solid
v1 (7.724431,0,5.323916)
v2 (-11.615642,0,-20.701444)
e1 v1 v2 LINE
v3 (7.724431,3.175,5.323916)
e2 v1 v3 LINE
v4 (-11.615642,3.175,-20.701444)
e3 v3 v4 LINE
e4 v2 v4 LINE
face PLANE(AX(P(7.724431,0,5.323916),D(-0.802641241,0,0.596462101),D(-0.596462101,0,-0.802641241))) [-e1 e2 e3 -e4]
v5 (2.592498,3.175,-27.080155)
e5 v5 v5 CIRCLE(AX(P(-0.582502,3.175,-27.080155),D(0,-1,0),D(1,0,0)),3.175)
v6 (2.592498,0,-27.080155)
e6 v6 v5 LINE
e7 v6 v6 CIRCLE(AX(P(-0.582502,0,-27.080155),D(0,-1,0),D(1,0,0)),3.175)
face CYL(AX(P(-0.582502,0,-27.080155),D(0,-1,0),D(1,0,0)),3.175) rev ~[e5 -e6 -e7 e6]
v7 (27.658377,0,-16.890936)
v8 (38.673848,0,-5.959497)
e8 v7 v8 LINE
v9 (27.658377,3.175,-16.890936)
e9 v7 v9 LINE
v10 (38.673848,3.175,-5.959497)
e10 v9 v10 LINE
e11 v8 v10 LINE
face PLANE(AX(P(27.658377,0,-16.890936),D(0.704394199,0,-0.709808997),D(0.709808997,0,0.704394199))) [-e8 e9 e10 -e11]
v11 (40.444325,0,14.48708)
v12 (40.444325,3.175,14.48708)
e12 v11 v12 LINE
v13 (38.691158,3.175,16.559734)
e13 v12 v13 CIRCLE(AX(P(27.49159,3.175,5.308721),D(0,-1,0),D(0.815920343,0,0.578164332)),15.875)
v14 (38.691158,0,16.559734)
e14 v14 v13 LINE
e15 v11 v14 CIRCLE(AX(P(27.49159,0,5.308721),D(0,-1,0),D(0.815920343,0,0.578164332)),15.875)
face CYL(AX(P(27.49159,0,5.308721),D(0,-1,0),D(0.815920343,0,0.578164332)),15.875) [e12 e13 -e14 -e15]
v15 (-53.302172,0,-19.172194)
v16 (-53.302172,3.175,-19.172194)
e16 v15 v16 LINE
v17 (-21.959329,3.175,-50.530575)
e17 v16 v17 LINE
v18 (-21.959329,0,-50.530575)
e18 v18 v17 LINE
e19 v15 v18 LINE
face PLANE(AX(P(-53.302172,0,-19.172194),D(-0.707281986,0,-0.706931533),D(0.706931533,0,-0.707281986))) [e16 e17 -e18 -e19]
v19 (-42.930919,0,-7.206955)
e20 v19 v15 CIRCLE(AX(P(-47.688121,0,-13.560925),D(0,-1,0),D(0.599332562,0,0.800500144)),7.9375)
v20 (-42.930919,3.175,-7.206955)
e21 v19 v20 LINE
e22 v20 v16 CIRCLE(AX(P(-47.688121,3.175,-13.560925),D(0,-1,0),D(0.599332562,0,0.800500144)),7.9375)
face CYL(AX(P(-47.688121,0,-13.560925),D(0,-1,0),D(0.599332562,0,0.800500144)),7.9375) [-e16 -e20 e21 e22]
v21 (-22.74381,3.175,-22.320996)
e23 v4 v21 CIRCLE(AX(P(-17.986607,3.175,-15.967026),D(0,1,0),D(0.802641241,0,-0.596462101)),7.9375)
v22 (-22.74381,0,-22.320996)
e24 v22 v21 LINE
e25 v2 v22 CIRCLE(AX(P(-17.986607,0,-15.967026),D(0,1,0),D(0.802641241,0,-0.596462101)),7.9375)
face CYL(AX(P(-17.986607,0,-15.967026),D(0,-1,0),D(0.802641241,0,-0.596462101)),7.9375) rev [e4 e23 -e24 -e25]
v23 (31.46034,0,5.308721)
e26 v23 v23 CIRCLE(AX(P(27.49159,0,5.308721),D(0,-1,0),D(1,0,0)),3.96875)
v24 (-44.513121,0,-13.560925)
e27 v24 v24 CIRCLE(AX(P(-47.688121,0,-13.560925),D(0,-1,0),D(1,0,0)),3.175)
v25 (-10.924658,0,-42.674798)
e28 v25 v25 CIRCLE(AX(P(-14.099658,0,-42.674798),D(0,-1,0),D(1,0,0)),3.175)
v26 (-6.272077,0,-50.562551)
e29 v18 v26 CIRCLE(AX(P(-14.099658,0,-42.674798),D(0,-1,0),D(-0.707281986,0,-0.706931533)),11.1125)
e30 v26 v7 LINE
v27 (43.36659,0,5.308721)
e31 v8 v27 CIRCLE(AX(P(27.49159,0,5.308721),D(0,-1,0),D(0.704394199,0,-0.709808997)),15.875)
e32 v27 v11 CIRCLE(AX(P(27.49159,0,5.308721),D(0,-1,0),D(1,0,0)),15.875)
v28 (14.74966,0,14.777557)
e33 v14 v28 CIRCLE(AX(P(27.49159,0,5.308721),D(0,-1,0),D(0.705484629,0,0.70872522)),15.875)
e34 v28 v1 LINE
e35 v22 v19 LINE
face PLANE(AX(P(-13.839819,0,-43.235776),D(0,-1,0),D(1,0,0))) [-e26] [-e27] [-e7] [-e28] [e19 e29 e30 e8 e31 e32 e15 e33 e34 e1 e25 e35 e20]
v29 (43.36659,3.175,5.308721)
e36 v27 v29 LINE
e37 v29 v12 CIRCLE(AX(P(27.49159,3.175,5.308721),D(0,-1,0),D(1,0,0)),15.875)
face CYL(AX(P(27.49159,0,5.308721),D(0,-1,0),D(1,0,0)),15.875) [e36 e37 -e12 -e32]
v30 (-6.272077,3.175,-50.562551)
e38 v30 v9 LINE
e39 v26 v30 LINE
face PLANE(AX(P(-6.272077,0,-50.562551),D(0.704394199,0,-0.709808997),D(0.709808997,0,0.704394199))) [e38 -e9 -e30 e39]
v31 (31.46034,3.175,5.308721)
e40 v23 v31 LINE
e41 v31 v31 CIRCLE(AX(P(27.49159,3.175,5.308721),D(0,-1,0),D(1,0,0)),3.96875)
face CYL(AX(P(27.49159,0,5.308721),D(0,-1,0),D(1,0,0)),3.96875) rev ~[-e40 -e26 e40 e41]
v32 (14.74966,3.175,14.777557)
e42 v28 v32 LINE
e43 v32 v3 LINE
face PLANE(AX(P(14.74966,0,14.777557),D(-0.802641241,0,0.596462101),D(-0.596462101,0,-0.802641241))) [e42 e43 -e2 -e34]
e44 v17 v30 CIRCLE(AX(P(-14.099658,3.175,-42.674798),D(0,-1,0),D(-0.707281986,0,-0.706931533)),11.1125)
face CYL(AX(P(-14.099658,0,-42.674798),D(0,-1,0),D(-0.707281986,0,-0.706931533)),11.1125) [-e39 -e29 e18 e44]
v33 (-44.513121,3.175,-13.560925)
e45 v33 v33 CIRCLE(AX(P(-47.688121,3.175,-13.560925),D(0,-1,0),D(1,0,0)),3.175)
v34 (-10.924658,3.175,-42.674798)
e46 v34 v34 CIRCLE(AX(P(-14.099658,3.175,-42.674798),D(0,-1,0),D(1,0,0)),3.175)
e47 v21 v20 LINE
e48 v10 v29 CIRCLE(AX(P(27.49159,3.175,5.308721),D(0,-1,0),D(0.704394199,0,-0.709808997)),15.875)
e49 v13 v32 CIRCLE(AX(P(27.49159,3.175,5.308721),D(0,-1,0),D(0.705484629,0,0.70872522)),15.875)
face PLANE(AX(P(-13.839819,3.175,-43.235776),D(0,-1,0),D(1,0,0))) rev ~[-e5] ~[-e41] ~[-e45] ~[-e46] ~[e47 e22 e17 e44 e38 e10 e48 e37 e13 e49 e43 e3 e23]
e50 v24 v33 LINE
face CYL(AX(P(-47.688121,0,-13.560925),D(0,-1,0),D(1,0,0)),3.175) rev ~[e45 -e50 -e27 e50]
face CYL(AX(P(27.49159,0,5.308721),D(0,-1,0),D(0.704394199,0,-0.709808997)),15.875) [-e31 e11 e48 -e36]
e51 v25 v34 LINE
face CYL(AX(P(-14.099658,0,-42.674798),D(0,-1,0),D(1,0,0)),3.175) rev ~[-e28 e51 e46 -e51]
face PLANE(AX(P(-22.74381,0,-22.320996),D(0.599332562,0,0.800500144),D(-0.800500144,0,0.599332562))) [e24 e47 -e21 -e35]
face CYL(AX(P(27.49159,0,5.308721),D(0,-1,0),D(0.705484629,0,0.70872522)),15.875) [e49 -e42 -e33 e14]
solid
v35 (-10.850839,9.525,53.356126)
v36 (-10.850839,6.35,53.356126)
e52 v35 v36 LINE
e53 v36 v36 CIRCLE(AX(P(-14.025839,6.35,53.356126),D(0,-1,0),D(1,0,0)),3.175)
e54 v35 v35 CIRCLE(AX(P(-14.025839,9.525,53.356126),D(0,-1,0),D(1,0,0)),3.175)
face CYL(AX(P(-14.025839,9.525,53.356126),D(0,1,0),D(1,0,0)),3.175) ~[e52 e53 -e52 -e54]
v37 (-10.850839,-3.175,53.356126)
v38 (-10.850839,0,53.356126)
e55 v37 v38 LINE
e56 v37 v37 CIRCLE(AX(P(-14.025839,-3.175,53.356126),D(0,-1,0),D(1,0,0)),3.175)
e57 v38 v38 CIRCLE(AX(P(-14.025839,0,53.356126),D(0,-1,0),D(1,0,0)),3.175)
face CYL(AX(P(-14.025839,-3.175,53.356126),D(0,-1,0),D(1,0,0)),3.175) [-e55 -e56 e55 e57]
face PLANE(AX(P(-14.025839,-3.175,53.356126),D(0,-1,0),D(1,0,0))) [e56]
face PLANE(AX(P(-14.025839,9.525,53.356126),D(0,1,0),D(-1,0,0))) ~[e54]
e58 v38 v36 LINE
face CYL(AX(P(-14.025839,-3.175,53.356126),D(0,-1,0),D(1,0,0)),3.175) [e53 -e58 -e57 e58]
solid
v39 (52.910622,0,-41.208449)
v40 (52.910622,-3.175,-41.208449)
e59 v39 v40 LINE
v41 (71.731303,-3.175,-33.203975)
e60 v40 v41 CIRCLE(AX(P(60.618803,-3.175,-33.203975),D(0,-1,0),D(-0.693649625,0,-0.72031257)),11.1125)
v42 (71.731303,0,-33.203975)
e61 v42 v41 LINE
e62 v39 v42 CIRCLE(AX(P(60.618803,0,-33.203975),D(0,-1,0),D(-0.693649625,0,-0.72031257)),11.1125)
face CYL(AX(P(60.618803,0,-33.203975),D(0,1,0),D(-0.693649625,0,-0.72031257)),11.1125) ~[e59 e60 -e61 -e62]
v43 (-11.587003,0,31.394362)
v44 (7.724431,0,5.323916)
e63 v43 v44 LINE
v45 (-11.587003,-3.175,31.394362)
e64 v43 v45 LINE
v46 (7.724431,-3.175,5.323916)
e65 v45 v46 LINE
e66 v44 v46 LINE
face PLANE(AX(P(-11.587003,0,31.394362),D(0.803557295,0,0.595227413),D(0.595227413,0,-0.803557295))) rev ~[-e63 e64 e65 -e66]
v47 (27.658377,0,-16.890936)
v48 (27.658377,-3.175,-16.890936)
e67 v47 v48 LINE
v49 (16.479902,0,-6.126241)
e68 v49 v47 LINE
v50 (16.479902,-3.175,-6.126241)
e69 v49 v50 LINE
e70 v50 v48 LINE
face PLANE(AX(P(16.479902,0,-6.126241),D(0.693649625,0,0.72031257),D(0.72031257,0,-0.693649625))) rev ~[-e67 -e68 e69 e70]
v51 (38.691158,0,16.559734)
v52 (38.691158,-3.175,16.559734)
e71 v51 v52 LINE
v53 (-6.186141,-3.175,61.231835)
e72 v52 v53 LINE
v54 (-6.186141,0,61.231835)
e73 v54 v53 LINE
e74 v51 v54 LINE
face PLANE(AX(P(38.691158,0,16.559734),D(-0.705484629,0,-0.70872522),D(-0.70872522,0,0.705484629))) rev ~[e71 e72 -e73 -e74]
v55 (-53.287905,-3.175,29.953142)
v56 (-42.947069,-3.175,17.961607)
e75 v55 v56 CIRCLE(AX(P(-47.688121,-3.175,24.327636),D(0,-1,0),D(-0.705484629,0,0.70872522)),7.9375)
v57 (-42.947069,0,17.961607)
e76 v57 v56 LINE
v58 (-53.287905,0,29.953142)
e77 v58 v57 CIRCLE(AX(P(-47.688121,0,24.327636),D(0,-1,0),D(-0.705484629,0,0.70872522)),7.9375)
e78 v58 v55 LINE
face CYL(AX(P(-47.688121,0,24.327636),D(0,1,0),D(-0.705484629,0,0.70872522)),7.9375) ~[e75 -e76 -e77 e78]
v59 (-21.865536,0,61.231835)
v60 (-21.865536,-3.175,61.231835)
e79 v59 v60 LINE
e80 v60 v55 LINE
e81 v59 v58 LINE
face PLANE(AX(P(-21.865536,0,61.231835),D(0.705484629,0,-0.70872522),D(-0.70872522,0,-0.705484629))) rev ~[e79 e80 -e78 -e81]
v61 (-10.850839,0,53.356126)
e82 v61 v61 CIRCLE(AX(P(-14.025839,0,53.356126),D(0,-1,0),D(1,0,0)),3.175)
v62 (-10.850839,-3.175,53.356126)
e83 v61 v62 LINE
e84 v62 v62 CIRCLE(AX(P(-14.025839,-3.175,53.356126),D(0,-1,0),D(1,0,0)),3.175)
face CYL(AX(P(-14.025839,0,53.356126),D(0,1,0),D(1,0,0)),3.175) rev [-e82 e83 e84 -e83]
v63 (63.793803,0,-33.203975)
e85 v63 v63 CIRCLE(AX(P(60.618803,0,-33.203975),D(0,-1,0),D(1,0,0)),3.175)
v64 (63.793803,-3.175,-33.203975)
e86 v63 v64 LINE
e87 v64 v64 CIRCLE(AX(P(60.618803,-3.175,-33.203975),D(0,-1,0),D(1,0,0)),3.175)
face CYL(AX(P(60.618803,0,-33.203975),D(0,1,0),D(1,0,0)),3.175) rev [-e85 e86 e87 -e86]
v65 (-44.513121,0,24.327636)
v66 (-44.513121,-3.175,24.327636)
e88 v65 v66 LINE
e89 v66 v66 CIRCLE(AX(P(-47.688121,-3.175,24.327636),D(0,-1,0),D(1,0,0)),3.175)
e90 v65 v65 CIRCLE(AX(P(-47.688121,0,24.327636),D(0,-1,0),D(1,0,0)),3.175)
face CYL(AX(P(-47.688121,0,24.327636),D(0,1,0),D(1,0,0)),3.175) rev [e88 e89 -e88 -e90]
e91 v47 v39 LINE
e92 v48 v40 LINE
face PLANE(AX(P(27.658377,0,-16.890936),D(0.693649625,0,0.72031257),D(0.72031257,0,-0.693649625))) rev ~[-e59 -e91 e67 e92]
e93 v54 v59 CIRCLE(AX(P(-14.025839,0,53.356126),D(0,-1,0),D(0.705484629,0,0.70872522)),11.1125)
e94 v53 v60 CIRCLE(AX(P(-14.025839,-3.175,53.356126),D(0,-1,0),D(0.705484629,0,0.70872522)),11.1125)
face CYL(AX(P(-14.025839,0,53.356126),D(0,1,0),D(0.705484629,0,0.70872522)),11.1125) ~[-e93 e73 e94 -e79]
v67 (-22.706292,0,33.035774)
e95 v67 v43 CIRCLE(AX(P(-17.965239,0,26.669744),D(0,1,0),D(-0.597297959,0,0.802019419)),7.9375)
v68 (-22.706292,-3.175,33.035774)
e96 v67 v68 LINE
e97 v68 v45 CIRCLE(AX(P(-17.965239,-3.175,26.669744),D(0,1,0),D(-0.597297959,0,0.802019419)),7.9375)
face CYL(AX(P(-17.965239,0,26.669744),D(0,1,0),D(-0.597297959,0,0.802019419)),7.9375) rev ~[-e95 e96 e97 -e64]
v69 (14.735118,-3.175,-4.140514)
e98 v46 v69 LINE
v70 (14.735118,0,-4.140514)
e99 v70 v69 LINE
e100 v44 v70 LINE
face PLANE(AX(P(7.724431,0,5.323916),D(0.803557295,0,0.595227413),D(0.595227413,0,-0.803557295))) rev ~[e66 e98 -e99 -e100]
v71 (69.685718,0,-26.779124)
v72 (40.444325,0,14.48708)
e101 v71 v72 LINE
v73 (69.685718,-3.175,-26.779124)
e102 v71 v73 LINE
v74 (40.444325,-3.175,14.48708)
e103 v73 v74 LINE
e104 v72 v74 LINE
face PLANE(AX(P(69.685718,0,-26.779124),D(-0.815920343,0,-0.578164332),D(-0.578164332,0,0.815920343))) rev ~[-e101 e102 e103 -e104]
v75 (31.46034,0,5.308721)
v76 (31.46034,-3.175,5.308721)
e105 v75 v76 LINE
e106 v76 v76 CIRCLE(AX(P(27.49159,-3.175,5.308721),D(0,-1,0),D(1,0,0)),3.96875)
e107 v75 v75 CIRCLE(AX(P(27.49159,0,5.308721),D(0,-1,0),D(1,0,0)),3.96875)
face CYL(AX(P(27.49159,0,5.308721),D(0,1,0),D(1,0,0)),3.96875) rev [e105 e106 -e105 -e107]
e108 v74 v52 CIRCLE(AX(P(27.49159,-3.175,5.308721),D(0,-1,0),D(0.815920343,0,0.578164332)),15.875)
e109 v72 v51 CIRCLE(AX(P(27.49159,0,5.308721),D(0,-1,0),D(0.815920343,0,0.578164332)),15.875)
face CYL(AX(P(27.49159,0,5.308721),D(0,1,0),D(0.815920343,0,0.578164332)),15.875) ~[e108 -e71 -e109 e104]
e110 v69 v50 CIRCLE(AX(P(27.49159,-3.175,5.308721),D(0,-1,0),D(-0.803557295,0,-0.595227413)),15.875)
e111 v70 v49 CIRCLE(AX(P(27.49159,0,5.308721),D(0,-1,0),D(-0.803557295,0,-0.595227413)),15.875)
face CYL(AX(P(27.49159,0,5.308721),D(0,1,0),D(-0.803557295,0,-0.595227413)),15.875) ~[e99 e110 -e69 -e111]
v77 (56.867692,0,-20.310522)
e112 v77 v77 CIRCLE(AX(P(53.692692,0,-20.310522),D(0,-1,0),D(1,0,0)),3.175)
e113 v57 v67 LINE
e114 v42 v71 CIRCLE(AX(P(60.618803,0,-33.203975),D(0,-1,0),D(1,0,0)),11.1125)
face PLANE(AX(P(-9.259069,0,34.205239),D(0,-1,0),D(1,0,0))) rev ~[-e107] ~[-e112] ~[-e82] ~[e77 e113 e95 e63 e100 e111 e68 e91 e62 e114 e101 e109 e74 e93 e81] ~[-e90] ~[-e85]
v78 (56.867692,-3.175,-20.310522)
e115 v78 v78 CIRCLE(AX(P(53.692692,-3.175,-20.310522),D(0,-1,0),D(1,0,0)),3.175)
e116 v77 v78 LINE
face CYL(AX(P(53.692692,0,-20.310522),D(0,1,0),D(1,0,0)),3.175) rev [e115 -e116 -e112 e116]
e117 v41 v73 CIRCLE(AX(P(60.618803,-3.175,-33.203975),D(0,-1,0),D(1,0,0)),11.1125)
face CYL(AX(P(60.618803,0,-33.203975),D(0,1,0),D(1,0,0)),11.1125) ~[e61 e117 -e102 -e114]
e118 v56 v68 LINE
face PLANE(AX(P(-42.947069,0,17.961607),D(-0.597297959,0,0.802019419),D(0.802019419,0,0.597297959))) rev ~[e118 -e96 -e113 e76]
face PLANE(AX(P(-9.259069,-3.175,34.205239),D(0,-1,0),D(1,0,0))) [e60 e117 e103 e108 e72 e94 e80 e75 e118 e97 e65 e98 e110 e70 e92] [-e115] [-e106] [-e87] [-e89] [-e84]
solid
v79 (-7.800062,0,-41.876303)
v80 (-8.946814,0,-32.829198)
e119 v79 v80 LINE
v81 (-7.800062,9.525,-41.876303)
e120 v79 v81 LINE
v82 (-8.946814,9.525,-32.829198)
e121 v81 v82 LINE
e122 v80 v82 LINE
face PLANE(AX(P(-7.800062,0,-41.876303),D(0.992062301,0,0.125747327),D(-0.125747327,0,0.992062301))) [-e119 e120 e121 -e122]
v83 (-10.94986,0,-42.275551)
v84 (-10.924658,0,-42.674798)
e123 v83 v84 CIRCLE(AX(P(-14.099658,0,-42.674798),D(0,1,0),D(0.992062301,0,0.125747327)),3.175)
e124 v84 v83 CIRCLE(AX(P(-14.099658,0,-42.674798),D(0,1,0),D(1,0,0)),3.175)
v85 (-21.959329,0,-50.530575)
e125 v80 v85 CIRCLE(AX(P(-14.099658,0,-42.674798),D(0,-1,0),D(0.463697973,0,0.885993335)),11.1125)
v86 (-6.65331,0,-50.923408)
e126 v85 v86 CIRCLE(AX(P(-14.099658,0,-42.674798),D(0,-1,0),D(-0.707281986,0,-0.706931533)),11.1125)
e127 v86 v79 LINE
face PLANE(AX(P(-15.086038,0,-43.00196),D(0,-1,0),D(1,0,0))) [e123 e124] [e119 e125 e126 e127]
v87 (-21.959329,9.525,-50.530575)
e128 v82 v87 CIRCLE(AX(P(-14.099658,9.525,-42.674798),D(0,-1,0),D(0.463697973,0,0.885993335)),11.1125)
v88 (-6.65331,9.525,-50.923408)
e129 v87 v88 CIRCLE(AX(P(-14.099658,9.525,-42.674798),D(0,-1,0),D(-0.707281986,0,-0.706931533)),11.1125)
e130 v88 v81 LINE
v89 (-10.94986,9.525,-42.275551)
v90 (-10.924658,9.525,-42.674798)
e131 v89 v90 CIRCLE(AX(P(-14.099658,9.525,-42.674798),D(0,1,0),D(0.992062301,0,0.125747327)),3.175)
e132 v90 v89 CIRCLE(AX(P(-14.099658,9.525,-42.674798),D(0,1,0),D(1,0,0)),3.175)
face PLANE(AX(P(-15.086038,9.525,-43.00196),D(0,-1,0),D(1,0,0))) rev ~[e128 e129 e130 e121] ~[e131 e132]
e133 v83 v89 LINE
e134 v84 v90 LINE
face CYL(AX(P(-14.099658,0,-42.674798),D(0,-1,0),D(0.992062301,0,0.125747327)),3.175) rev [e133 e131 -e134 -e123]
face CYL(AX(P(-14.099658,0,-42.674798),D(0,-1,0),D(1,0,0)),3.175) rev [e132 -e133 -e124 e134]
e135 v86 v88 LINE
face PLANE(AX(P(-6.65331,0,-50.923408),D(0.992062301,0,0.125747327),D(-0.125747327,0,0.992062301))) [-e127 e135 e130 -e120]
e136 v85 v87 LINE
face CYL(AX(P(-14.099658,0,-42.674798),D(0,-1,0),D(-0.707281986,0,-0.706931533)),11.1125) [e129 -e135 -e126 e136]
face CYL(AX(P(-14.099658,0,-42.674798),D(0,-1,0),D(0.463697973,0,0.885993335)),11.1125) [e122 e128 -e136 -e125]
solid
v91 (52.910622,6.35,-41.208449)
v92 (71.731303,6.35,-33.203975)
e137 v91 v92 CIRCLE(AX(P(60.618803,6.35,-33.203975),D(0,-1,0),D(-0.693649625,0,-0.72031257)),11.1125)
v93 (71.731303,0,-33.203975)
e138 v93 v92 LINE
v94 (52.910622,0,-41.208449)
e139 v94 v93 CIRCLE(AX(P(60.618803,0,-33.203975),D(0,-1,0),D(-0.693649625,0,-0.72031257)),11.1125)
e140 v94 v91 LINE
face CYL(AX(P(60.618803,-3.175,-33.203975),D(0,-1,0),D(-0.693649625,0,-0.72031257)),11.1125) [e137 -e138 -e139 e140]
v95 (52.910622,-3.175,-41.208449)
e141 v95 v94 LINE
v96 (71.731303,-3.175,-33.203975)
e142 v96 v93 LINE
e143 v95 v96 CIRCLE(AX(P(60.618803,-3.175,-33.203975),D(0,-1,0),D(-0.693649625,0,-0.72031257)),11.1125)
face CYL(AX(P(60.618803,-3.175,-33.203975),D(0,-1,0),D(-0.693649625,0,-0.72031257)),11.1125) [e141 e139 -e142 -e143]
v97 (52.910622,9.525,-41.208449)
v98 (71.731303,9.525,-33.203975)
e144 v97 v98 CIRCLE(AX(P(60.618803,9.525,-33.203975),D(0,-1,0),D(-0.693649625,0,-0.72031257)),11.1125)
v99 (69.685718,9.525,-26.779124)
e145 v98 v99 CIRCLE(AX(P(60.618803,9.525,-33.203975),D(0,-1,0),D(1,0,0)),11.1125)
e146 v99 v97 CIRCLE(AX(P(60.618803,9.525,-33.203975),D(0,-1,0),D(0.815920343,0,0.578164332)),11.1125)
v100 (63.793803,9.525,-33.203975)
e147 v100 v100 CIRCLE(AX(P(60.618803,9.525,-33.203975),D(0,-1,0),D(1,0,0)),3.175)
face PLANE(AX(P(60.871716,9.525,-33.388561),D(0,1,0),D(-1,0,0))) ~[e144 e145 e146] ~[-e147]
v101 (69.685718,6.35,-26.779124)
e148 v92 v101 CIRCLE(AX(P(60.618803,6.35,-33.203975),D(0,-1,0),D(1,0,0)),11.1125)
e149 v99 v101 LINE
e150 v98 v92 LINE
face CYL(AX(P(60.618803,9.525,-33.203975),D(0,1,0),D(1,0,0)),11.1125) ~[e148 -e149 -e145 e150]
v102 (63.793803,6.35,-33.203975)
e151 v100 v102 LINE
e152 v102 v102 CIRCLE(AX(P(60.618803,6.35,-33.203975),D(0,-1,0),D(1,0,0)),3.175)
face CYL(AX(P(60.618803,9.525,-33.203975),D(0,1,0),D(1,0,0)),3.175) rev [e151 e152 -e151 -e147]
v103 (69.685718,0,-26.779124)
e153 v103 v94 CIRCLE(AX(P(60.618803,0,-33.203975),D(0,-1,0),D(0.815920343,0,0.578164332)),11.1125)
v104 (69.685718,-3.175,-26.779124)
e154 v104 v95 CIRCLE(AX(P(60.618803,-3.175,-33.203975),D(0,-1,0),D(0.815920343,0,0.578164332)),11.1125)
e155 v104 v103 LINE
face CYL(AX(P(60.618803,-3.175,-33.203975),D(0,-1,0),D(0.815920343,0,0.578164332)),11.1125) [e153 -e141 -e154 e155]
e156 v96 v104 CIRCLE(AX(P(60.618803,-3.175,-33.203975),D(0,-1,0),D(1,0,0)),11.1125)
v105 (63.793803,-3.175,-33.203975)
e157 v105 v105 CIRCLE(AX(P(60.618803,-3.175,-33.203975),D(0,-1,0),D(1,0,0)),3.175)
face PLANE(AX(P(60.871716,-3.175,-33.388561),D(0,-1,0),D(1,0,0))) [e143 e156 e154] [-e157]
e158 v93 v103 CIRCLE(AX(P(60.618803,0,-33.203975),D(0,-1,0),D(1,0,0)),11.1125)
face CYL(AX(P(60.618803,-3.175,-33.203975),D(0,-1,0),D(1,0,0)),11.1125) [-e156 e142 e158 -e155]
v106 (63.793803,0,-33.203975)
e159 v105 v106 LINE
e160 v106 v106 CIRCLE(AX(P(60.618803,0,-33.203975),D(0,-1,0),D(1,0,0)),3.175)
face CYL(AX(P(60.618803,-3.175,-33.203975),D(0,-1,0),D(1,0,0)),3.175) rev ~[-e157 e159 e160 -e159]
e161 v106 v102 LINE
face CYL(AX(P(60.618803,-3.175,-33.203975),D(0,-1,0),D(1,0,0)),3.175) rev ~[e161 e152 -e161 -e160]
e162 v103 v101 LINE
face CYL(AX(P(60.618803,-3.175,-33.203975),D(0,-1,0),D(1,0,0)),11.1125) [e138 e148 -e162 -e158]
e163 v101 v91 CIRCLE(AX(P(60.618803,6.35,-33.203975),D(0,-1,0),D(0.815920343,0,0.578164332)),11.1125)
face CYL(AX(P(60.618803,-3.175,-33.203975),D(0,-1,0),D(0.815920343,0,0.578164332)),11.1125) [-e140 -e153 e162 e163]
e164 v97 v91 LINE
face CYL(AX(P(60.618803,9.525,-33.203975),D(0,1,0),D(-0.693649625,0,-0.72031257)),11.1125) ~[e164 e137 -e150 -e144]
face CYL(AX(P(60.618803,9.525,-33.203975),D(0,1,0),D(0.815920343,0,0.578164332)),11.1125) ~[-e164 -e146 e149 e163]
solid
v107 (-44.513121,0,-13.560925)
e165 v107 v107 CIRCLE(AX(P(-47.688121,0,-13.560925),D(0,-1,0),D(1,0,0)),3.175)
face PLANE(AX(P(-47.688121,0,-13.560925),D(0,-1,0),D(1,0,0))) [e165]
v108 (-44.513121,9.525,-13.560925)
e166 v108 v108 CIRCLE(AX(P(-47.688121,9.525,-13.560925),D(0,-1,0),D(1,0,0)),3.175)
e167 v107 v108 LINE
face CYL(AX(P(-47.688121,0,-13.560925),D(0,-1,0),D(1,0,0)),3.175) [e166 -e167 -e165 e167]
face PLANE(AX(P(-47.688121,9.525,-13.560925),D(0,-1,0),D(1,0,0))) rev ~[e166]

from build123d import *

# Parameters (mm, degrees)
F0_R     = 3.175
F0_R_2   = 3.96875
F1_DEPTH = 3.175
F2_DEPTH = 3.175
F4_R     = 3.175
F6_DEPTH = 9.525
F3_R     = 3.175


# Not quite as in the source:
# - a pattern or mirror of a feature is missing from the dataset's text; its kind, count and spacing are read off the source's solid


with BuildPart() as f1:
    # F0 (on Front) → F1 (new body)
    with BuildSketch(Plane.XZ):
        with BuildLine():
            ThreePointArc((14.7496603052, 14.7775566037), (26.3131341296, 21.1399199057), (38.6911584981, 16.5597336206))
            Line((38.6911584981, 16.5597336206), (-6.186140597, 61.2318347541))
            ThreePointArc((-6.186140597, 61.2318347541), (-3.7641062388, 57.6204552843), (-2.9133385399, 53.3561257439))
            ThreePointArc((-2.9133385399, 53.3561257439), (-18.2901680804, 43.0943934427), (-21.8655364829, 61.2318347541))
            Line((-21.8655364829, 61.2318347541), (-53.2879053781, 29.953142198))
            ThreePointArc((-53.2879053781, 29.953142198), (-44.6421714614, 31.6574445487), (-39.7506211331, 24.3276357622))
            ThreePointArc((-39.7506211331, 24.3276357622), (-40.5946025832, 20.7659085362), (-42.9470685869, 17.9616066227))
            Line((-42.9470685869, 17.9616066227), (-22.7062919024, 33.0357735381))
            ThreePointArc((-22.7062919024, 33.0357735381), (-16.8060800027, 34.5221488612), (-11.587003326, 31.3943619908))
            Line((-11.587003326, 31.3943619908), (7.72443139, 5.3239158017))
            Line((7.72443139, 5.3239158017), (14.7496603052, 14.7775566037))
        make_face()
        with BuildLine():
            ThreePointArc((52.9106217019, -41.2084486244), (53.372225282, -24.7793229574), (69.6857179674, -26.7791240605))
            Line((69.6857179674, -26.7791240605), (40.4443254491, 14.4870795127))
            ThreePointArc((40.4443254491, 14.4870795127), (42.6183923822, 10.124888825), (43.3665900081, 5.3087207489))
            ThreePointArc((43.3665900081, 5.3087207489), (42.1465203967, -0.7944456676), (38.6738479221, -5.9594970758))
            Line((38.6738479221, -5.9594970758), (27.6583771328, -16.8909360421))
            Line((27.6583771328, -16.8909360421), (52.9106217019, -41.2084486244))
        make_face()
        with Locations((53.6926918641, -20.310522387)):
            Circle(F0_R, mode=Mode.SUBTRACT)
        with BuildLine():
            ThreePointArc((-2.9133385399, 53.3561257439), (-3.7641062388, 57.6204552843), (-6.186140597, 61.2318347541))
            ThreePointArc((-6.186140597, 61.2318347541), (-14.0258385399, 64.4686257439), (-21.8655364829, 61.2318347541))
            ThreePointArc((-21.8655364829, 61.2318347541), (-18.2901680804, 43.0943934427), (-2.9133385399, 53.3561257439))
        make_face()
        with Locations((-14.0258385399, 53.3561257439)):
            Circle(F0_R, mode=Mode.SUBTRACT)
        with BuildLine():
            ThreePointArc((-39.7506211331, 24.3276357622), (-44.6421714614, 31.6574445487), (-53.2879053781, 29.953142198))
            ThreePointArc((-53.2879053781, 29.953142198), (-53.6992430247, 19.1439768369), (-42.9470685869, 17.9616066227))
            ThreePointArc((-42.9470685869, 17.9616066227), (-40.5946025832, 20.7659085362), (-39.7506211331, 24.3276357622))
        make_face()
        with Locations((-47.6881211331, 24.3276357622)):
            Circle(F0_R, mode=Mode.SUBTRACT)
        with BuildLine():
            ThreePointArc((52.9106217019, -41.2084486244), (64.9679691599, -43.4300404866), (71.7313031587, -33.2039751952))
            ThreePointArc((71.7313031587, -33.2039751952), (71.2075648205, -29.8326575419), (69.6857179674, -26.7791240605))
            ThreePointArc((69.6857179674, -26.7791240605), (53.372225282, -24.7793229574), (52.9106217019, -41.2084486244))
        make_face()
        with Locations((60.6188031587, -33.2039751952)):
            Circle(F0_R, mode=Mode.SUBTRACT)
        with BuildLine():
            ThreePointArc((43.3665900081, 5.3087207489), (42.6183923822, 10.124888825), (40.4443254491, 14.4870795127))
            ThreePointArc((40.4443254491, 14.4870795127), (39.6121271272, 15.5609500159), (38.6911584981, 16.5597336206))
            ThreePointArc((38.6911584981, 16.5597336206), (26.3131341296, 21.1399199057), (14.7496603052, 14.7775566037))
            ThreePointArc((14.7496603052, 14.7775566037), (11.6165946984, 5.3209238883), (14.7351179476, -4.1405144355))
            ThreePointArc((14.7351179476, -4.1405144355), (15.5661074803, -5.1697567874), (16.4799022127, -6.1262412929))
            ThreePointArc((16.4799022127, -6.1262412929), (27.6108563061, -10.5658312306), (38.6738479221, -5.9594970758))
            ThreePointArc((38.6738479221, -5.9594970758), (42.1465203967, -0.7944456676), (43.3665900081, 5.3087207489))
        make_face()
        with Locations((27.4915900081, 5.3087207489)):
            Circle(F0_R_2, mode=Mode.SUBTRACT)
        with BuildLine():
            ThreePointArc((14.7351179476, -4.1405144355), (11.6165946984, 5.3209238883), (14.7496603052, 14.7775566037))
            Line((14.7496603052, 14.7775566037), (7.72443139, 5.3239158017))
            Line((7.72443139, 5.3239158017), (14.7351179476, -4.1405144355))
        make_face()
        with BuildLine():
            Line((16.4799022127, -6.1262412929), (27.6583771328, -16.8909360421))
            Line((27.6583771328, -16.8909360421), (38.6738479221, -5.9594970758))
            ThreePointArc((38.6738479221, -5.9594970758), (27.6108563061, -10.5658312306), (16.4799022127, -6.1262412929))
        make_face()
    extrude(amount=F1_DEPTH)


with BuildPart() as f2:
    # F0 (on Front) → F2 (new body)
    with BuildSketch(Plane.XZ):
        with BuildLine():
            ThreePointArc((-21.9593287693, -50.530575103), (-14.1223086093, -53.7872753618), (-6.2720771563, -50.5625509241))
            ThreePointArc((-6.2720771563, -50.5625509241), (-3.8412064241, -46.9470149384), (-2.9871576961, -42.6747984468))
            ThreePointArc((-2.9871576961, -42.6747984468), (-18.3509552303, -32.4076603098), (-21.9593287693, -50.530575103))
        make_face()
        with Locations((-14.0996576961, -42.6747984468)):
            Circle(F0_R, mode=Mode.SUBTRACT)
        with BuildLine():
            ThreePointArc((-42.9309189236, -7.2069551619), (-53.6860610326, -8.3620190908), (-53.3021718997, -19.172194094))
            ThreePointArc((-53.3021718997, -19.172194094), (-44.6514800372, -20.8945951518), (-39.7506211331, -13.5609250539))
            ThreePointArc((-39.7506211331, -13.5609250539), (-40.5900862364, -10.0082068191), (-42.9309189236, -7.2069551619))
        make_face()
        with Locations((-47.6881211331, -13.5609250539)):
            Circle(F0_R, mode=Mode.SUBTRACT)
        with BuildLine():
            Line((16.4799022127, -6.1262412929), (27.6583771328, -16.8909360421))
            Line((27.6583771328, -16.8909360421), (38.6738479221, -5.9594970758))
            ThreePointArc((38.6738479221, -5.9594970758), (27.6108563061, -10.5658312306), (16.4799022127, -6.1262412929))
        make_face()
        with BuildLine():
            ThreePointArc((43.3665900081, 5.3087207489), (42.6183923822, 10.124888825), (40.4443254491, 14.4870795127))
            ThreePointArc((40.4443254491, 14.4870795127), (39.6121271272, 15.5609500159), (38.6911584981, 16.5597336206))
            ThreePointArc((38.6911584981, 16.5597336206), (26.3131341296, 21.1399199057), (14.7496603052, 14.7775566037))
            ThreePointArc((14.7496603052, 14.7775566037), (11.6165946984, 5.3209238883), (14.7351179476, -4.1405144355))
            ThreePointArc((14.7351179476, -4.1405144355), (15.5661074803, -5.1697567874), (16.4799022127, -6.1262412929))
            ThreePointArc((16.4799022127, -6.1262412929), (27.6108563061, -10.5658312306), (38.6738479221, -5.9594970758))
            ThreePointArc((38.6738479221, -5.9594970758), (42.1465203967, -0.7944456676), (43.3665900081, 5.3087207489))
        make_face()
        with Locations((27.4915900081, 5.3087207489)):
            Circle(F0_R_2, mode=Mode.SUBTRACT)
        with BuildLine():
            Line((-6.2720771563, -50.5625509241), (27.6583771328, -16.8909360421))
            Line((27.6583771328, -16.8909360421), (16.4799022127, -6.1262412929))
            ThreePointArc((16.4799022127, -6.1262412929), (15.5661074803, -5.1697567874), (14.7351179476, -4.1405144355))
            Line((14.7351179476, -4.1405144355), (7.72443139, 5.3239158017))
            Line((7.72443139, 5.3239158017), (-11.6156424823, -20.7014441798))
            ThreePointArc((-11.6156424823, -20.7014441798), (-16.8434561593, -23.8217771487), (-22.7438095433, -22.3209961443))
            Line((-22.7438095433, -22.3209961443), (-42.9309189236, -7.2069551619))
            ThreePointArc((-42.9309189236, -7.2069551619), (-40.5900862364, -10.0082068191), (-39.7506211331, -13.5609250539))
            ThreePointArc((-39.7506211331, -13.5609250539), (-44.6514800372, -20.8945951518), (-53.3021718997, -19.172194094))
            Line((-53.3021718997, -19.172194094), (-21.9593287693, -50.530575103))
            ThreePointArc((-21.9593287693, -50.530575103), (-18.3509552303, -32.4076603098), (-2.9871576961, -42.6747984468))
            ThreePointArc((-2.9871576961, -42.6747984468), (-3.8412064241, -46.9470149384), (-6.2720771563, -50.5625509241))
        make_face()
        with Locations((-0.5825021922, -27.0801547082)):
            Circle(F0_R, mode=Mode.SUBTRACT)
        with BuildLine():
            ThreePointArc((14.7351179476, -4.1405144355), (11.6165946984, 5.3209238883), (14.7496603052, 14.7775566037))
            Line((14.7496603052, 14.7775566037), (7.72443139, 5.3239158017))
            Line((7.72443139, 5.3239158017), (14.7351179476, -4.1405144355))
        make_face()
    extrude(amount=-F2_DEPTH)


with BuildPart() as f6:
    # F4 (on face) → F6 (new body, through all)
    with BuildSketch(Plane.XZ):
        with Locations((-47.6881211331, -13.5609250539)):
            Circle(F4_R)
    extrude(amount=-F6_DEPTH)


with BuildPart() as f6b:
    # F4 (on face) → F6, piece 2 (new body, through all)
    with BuildSketch(Plane.XZ):
        with BuildLine():
            Line((-7.8000620823, -41.876302922), (-8.9468139737, -32.8291975092))
            ThreePointArc((-8.9468139737, -32.8291975092), (-23.0532279759, -36.0929115218), (-21.9593287693, -50.530575103))
            ThreePointArc((-21.9593287693, -50.530575103), (-14.3847692181, -53.7836403158), (-6.653310191, -50.9234083348))
            Line((-6.653310191, -50.9234083348), (-7.8000620823, -41.876302922))
        make_face()
        with BuildLine():
            ThreePointArc((-10.9246576961, -42.6747984468), (-17.2683508839, -42.8748196497), (-10.9498598892, -42.2755506844))
            ThreePointArc((-10.9498598892, -42.2755506844), (-10.9309645083, -42.474777244), (-10.9246576961, -42.6747984468))
        make_face(mode=Mode.SUBTRACT)
    extrude(amount=-F6_DEPTH)


with BuildPart() as f6c:
    # F3 (on face) → F6, piece 3 (new body, through all)
    with BuildSketch(Plane.XZ.offset(3.175)):
        with BuildLine():
            ThreePointArc((52.9106217019, -41.2084486244), (64.9679691599, -43.4300404866), (71.7313031587, -33.2039751952))
            ThreePointArc((71.7313031587, -33.2039751952), (71.2075648205, -29.8326575419), (69.6857179674, -26.7791240605))
            ThreePointArc((69.6857179674, -26.7791240605), (53.372225282, -24.7793229574), (52.9106217019, -41.2084486244))
        make_face()
        with Locations((60.6188031587, -33.2039751952)):
            Circle(F3_R, mode=Mode.SUBTRACT)
    extrude(amount=-F6_DEPTH)

    # F6_3_copies: F6c across plane


with BuildPart() as f6d:
    # F3 (on face) → F6, piece 4 (new body, through all)
    with BuildSketch(Plane.XZ.offset(3.175)):
        with Locations((-14.0258385399, 53.3561257439)):
            Circle(F3_R)
    extrude(amount=-F6_DEPTH)

    # F6_4_copies: F6d across plane


with BuildPart() as f6c_1:
    add(f6c.part)
    add(f6c.part.mirror(Plane.ZX.offset(3.175)))


with BuildPart() as f6d_1:
    add(f6d.part)
    add(f6d.part.mirror(Plane.ZX.offset(3.175)))


solid = Compound([f1.part, f2.part, f6.part, f6b.part, f6c_1.part, f6d_1.part])
